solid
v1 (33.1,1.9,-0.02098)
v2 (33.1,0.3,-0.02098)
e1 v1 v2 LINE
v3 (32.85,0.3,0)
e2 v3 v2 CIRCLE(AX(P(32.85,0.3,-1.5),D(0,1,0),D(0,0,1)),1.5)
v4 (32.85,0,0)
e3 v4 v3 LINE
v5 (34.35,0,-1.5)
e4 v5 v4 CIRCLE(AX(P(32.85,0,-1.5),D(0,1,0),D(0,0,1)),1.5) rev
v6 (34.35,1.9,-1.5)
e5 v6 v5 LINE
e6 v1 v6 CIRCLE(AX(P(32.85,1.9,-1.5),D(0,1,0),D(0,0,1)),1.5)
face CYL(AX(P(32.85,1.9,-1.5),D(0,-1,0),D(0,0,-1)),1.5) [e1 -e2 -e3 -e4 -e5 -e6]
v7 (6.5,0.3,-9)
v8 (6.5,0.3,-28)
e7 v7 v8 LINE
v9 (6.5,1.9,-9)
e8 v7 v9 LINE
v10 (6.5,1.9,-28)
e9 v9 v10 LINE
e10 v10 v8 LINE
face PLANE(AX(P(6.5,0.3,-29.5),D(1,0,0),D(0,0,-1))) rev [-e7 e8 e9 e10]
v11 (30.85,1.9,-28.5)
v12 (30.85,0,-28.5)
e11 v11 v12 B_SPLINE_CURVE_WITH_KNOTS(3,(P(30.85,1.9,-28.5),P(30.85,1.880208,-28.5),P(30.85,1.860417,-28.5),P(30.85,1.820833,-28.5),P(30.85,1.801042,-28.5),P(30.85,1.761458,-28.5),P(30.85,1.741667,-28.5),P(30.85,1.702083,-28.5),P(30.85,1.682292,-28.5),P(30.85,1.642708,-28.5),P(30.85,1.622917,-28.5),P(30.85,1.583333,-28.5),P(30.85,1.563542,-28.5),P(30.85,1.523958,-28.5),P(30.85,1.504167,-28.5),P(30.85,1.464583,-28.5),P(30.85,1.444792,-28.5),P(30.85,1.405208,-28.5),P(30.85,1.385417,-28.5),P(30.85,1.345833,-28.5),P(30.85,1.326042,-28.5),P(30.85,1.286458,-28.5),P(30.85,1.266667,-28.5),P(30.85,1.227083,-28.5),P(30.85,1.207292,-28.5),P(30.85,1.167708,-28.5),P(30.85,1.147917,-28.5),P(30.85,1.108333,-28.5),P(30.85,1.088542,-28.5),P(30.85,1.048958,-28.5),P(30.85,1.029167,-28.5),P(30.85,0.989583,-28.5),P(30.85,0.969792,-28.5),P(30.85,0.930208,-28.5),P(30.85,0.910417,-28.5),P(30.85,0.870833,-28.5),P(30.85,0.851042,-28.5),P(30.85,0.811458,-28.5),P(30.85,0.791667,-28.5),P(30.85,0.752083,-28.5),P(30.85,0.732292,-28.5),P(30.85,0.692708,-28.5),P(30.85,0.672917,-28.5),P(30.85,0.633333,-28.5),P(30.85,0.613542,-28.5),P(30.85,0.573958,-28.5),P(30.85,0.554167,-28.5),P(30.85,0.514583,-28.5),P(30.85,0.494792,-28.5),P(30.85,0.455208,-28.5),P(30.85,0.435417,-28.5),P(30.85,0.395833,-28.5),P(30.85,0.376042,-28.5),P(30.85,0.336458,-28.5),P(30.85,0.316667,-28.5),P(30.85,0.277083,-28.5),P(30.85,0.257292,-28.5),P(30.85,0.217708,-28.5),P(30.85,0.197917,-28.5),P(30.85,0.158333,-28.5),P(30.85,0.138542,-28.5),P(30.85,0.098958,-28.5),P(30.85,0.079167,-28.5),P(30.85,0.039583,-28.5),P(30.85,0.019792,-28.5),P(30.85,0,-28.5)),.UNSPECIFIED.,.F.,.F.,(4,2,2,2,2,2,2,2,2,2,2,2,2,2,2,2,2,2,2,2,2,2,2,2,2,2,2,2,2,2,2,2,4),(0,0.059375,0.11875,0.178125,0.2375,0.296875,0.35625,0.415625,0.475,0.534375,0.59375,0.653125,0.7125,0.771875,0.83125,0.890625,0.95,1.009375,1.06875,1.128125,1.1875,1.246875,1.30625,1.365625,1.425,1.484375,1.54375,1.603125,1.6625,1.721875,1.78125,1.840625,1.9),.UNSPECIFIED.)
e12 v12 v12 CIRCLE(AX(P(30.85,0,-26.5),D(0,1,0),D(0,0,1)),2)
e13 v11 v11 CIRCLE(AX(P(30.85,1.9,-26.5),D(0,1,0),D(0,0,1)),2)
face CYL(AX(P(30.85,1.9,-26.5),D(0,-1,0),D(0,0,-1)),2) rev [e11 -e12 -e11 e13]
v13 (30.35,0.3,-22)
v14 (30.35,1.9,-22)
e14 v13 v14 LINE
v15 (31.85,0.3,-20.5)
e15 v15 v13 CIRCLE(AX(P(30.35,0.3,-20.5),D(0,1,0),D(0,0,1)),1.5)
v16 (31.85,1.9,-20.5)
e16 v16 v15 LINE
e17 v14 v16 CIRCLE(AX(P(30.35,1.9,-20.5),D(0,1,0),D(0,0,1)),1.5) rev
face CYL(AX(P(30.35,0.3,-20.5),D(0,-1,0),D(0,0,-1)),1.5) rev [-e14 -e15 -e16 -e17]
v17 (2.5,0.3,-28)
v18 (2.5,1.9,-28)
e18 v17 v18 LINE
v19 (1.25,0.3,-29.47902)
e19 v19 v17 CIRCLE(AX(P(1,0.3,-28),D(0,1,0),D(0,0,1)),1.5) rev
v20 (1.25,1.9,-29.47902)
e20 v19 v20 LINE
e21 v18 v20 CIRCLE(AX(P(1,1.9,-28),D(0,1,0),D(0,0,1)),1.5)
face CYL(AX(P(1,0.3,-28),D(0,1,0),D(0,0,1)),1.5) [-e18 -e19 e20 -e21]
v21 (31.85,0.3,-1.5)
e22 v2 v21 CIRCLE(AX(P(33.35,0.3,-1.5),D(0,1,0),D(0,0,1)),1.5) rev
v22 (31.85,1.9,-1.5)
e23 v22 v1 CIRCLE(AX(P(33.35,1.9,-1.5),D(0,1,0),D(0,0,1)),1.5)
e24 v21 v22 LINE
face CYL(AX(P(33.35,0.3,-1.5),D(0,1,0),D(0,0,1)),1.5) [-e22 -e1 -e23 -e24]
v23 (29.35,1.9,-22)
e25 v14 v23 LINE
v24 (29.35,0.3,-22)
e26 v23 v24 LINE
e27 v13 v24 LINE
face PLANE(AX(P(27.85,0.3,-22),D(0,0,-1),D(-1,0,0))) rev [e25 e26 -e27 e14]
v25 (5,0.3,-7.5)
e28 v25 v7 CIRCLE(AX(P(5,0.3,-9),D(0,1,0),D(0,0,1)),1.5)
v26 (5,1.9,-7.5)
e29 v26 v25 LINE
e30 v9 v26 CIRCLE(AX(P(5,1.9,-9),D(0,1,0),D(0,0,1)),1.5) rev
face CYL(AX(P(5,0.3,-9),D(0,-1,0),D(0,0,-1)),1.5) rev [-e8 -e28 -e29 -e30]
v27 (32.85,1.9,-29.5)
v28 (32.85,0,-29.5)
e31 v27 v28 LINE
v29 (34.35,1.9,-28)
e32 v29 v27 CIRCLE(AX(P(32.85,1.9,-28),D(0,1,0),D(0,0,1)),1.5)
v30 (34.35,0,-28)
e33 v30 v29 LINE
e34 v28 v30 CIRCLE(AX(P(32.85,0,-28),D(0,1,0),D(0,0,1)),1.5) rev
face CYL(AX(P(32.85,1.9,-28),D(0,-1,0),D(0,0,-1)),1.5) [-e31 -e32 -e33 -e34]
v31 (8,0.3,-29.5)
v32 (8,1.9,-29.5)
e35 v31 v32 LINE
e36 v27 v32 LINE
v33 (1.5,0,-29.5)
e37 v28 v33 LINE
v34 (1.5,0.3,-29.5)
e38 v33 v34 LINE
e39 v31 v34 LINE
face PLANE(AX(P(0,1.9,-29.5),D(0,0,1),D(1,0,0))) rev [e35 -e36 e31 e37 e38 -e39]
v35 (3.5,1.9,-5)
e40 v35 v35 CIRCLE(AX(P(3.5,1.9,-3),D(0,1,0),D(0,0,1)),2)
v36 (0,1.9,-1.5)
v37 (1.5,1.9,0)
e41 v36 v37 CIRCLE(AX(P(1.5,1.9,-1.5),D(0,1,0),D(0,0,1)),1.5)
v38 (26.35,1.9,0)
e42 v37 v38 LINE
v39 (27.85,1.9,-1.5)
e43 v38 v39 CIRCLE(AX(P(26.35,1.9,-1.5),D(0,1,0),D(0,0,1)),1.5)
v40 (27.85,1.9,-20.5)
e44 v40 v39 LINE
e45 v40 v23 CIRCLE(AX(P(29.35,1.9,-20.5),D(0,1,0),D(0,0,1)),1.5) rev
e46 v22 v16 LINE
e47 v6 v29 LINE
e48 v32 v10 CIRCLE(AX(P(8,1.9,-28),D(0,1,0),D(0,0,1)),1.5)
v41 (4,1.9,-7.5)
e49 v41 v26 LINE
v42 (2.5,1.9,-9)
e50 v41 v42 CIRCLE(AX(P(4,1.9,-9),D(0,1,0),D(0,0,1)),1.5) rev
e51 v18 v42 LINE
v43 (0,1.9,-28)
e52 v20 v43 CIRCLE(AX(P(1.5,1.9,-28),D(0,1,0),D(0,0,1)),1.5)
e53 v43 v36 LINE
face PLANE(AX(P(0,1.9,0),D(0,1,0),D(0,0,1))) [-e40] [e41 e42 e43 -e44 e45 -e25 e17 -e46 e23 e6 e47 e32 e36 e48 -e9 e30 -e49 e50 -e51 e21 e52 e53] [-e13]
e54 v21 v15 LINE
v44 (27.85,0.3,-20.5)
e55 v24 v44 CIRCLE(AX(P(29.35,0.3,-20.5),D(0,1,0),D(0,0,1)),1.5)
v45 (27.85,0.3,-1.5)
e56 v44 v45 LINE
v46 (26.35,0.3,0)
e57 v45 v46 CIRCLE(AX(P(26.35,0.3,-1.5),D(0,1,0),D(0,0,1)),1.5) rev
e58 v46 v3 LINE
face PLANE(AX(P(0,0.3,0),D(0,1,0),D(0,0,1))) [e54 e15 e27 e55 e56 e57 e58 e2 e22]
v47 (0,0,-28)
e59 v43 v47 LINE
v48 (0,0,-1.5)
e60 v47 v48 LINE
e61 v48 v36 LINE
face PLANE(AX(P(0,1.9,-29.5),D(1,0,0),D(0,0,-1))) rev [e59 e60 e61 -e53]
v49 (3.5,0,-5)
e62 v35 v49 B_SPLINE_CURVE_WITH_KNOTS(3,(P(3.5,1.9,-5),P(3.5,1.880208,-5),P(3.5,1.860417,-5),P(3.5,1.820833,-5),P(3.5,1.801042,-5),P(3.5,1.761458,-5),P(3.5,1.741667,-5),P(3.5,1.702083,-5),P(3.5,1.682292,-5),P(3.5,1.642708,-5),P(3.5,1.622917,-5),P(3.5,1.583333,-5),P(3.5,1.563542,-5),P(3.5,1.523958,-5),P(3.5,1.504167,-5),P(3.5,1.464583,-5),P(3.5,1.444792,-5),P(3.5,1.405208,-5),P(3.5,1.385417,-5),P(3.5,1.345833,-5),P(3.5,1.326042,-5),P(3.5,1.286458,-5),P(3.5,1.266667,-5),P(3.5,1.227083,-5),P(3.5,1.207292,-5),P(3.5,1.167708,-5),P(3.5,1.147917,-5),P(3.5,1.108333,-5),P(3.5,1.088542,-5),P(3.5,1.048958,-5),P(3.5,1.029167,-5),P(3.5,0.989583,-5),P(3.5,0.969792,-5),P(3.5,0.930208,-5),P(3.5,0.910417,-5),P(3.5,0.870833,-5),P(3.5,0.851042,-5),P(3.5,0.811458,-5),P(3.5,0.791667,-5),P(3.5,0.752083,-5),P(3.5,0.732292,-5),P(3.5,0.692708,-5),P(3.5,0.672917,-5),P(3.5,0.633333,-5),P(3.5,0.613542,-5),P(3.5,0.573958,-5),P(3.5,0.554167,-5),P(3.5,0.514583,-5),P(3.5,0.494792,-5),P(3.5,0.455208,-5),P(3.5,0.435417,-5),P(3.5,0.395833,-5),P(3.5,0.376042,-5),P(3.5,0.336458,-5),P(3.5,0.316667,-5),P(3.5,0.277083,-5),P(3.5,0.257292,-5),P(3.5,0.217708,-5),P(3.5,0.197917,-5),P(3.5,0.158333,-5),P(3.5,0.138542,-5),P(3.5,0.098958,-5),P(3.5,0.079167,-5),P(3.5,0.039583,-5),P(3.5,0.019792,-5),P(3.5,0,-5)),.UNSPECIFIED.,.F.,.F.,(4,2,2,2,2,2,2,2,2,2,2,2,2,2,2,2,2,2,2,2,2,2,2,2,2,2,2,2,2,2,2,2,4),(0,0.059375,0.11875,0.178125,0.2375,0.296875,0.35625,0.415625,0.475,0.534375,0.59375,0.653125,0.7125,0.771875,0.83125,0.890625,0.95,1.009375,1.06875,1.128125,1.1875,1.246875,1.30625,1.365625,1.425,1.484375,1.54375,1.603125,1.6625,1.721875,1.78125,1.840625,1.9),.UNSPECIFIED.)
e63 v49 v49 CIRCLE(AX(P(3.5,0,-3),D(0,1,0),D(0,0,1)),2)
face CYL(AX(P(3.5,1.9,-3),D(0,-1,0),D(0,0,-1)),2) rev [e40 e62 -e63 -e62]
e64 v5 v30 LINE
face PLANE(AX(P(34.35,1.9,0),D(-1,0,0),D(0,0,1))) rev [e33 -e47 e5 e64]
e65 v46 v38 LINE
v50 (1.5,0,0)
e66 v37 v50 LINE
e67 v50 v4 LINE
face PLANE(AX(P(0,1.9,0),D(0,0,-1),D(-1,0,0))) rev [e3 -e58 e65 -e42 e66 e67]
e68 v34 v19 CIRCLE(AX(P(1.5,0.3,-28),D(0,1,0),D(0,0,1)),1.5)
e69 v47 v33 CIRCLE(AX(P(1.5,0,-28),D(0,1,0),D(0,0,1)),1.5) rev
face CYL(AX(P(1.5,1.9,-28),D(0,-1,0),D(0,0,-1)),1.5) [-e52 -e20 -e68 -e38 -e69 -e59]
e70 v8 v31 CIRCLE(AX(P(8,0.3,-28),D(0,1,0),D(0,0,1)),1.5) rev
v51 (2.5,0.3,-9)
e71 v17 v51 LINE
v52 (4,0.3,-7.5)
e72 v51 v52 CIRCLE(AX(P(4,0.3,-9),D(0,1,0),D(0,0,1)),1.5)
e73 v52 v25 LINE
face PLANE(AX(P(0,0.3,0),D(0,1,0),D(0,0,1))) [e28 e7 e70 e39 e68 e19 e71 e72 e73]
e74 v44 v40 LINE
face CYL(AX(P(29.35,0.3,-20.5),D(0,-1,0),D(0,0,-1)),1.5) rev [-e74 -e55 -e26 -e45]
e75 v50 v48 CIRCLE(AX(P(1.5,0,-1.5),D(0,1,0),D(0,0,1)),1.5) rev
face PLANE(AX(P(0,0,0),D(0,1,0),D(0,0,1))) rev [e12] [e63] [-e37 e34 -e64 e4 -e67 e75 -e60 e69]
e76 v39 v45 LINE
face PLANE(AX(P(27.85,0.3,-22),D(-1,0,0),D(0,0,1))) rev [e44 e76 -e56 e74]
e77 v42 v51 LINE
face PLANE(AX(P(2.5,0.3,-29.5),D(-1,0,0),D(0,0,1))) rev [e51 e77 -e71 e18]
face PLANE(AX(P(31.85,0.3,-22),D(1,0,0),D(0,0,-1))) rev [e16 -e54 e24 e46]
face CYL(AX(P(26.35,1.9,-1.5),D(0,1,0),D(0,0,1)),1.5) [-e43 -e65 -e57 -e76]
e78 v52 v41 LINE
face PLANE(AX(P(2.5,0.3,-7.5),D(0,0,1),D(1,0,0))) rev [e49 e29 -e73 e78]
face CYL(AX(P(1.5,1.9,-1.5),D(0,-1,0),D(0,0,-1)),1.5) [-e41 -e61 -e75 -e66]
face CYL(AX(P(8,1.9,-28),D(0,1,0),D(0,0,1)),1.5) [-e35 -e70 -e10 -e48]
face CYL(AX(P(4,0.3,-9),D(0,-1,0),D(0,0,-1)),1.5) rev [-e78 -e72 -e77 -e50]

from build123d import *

# Parameters (mm, degrees)
CROQUIS1_W              = 34.35
CROQUIS1_H              = 29.5
CROQUIS1_R              = 2
SALIENTE_EXTRUIR1_DEPTH = 1.9
CROQUIS2_W              = 4
CROQUIS2_H              = 22
CORTAR_EXTRUIR2_DEPTH   = 1.6
REDONDEO1_R             = 1.5


with BuildPart() as part:
    # Croquis1 → Saliente-Extruir1 (new body)
    with BuildSketch(Plane(origin=(0, 0, 0), x_dir=(1, 0, 0), z_dir=(0, 1, 0))):
        with Locations((17.175, 14.75)):
            Rectangle(CROQUIS1_W, CROQUIS1_H)
        with Locations(Location((3.5, 3, 0), (0, 0, 90))):
            Circle(CROQUIS1_R, mode=Mode.SUBTRACT)
        with Locations(Location((30.85, 26.5, 0), (0, 0, 90))):
            Circle(CROQUIS1_R, mode=Mode.SUBTRACT)
    extrude(amount=SALIENTE_EXTRUIR1_DEPTH)

    # Croquis2 → Cortar-Extruir2 (cut)
    with BuildSketch(Plane(origin=(0, 1.9, 0), x_dir=(1, 0, 0), z_dir=(0, 1, 0))):
        with Locations((29.85, 11)):
            Rectangle(CROQUIS2_W, CROQUIS2_H)
        with Locations((4.5, 18.5)):
            Rectangle(CROQUIS2_W, CROQUIS2_H)
    extrude(amount=-CORTAR_EXTRUIR2_DEPTH, mode=Mode.SUBTRACT)

    # Redondeo1
    # the kernel refuses this fillet: 1.5 mm, written as the material it adds along each edge
    with BuildSketch(Plane(origin=(27.85, 1.9, -22), x_dir=(0, 0, 1), z_dir=(0, -1, 0))) as redondeo1_piece_1:
        with BuildLine():
            CenterArc((REDONDEO1_R, -REDONDEO1_R), REDONDEO1_R, 90, 90)
            Line((0, -REDONDEO1_R), (0, 0))
            Line((0, 0), (REDONDEO1_R, 0))
        make_face()
    extrude(amount=1.6)
    with BuildSketch(Plane(origin=(31.85, 1.9, -22), x_dir=(0, 0, 1), z_dir=(0, -1, 0)), Plane(origin=(2.5, 1.9, -7.5), x_dir=(0, 0, -1), z_dir=(0, -1, 0)), Plane(origin=(6.5, 1.9, -7.5), x_dir=(-1, 0, 0), z_dir=(0, -1, 0))) as redondeo1_piece_2:
        with BuildLine():
            CenterArc((REDONDEO1_R, REDONDEO1_R), REDONDEO1_R, 180, 90)
            Line((0, REDONDEO1_R), (0, 0))
            Line((0, 0), (REDONDEO1_R, 0))
        make_face()
    extrude(amount=1.6)
    # the kernel refuses this fillet: 1.5 mm, written as the material it takes off along each edge
    with BuildSketch(Plane(origin=(27.85, 5.65, 0), x_dir=(-1, 0, 0), z_dir=(0, -1, 0)), Plane(origin=(6.5, 5.65, -29.5), x_dir=(1, 0, 0), z_dir=(0, -1, 0))) as redondeo1_2_piece_1:
        with BuildLine():
            CenterArc((REDONDEO1_R, REDONDEO1_R), REDONDEO1_R, 180, 90)
            Line((0, REDONDEO1_R), (0, 0))
            Line((0, 0), (REDONDEO1_R, 0))
        make_face()
    extrude(amount=5.35, mode=Mode.SUBTRACT)
    with BuildSketch(Plane(origin=(31.85, 5.65, 0), x_dir=(1, 0, 0), z_dir=(0, -1, 0)), Plane(origin=(2.5, 5.65, -29.5), x_dir=(-1, 0, 0), z_dir=(0, -1, 0))) as redondeo1_2_piece_2:
        with BuildLine():
            CenterArc((REDONDEO1_R, -REDONDEO1_R), REDONDEO1_R, 90, 90)
            Line((0, -REDONDEO1_R), (0, 0))
            Line((0, 0), (REDONDEO1_R, 0))
        make_face()
    extrude(amount=5.35, mode=Mode.SUBTRACT)
    with BuildSketch(Plane(origin=(0, -3.75, -29.5), x_dir=(0, 0, 1), z_dir=(0, 1, 0)), Plane(origin=(0, -3.75, 0), x_dir=(1, 0, 0), z_dir=(0, 1, 0))) as redondeo1_2_piece_3:
        with BuildLine():
            CenterArc((REDONDEO1_R, REDONDEO1_R), REDONDEO1_R, 180, 90)
            Line((0, REDONDEO1_R), (0, 0))
            Line((0, 0), (REDONDEO1_R, 0))
        make_face()
    extrude(amount=9.4, mode=Mode.SUBTRACT)
    with BuildSketch(Plane(origin=(34.35, -3.75, -29.5), x_dir=(0, 0, 1), z_dir=(0, 1, 0)), Plane(origin=(34.35, -3.75, 0), x_dir=(-1, 0, 0), z_dir=(0, 1, 0))) as redondeo1_2_piece_4:
        with BuildLine():
            CenterArc((REDONDEO1_R, -REDONDEO1_R), REDONDEO1_R, 90, 90)
            Line((0, -REDONDEO1_R), (0, 0))
            Line((0, 0), (REDONDEO1_R, 0))
        make_face()
    extrude(amount=9.4, mode=Mode.SUBTRACT)


solid = part.part
